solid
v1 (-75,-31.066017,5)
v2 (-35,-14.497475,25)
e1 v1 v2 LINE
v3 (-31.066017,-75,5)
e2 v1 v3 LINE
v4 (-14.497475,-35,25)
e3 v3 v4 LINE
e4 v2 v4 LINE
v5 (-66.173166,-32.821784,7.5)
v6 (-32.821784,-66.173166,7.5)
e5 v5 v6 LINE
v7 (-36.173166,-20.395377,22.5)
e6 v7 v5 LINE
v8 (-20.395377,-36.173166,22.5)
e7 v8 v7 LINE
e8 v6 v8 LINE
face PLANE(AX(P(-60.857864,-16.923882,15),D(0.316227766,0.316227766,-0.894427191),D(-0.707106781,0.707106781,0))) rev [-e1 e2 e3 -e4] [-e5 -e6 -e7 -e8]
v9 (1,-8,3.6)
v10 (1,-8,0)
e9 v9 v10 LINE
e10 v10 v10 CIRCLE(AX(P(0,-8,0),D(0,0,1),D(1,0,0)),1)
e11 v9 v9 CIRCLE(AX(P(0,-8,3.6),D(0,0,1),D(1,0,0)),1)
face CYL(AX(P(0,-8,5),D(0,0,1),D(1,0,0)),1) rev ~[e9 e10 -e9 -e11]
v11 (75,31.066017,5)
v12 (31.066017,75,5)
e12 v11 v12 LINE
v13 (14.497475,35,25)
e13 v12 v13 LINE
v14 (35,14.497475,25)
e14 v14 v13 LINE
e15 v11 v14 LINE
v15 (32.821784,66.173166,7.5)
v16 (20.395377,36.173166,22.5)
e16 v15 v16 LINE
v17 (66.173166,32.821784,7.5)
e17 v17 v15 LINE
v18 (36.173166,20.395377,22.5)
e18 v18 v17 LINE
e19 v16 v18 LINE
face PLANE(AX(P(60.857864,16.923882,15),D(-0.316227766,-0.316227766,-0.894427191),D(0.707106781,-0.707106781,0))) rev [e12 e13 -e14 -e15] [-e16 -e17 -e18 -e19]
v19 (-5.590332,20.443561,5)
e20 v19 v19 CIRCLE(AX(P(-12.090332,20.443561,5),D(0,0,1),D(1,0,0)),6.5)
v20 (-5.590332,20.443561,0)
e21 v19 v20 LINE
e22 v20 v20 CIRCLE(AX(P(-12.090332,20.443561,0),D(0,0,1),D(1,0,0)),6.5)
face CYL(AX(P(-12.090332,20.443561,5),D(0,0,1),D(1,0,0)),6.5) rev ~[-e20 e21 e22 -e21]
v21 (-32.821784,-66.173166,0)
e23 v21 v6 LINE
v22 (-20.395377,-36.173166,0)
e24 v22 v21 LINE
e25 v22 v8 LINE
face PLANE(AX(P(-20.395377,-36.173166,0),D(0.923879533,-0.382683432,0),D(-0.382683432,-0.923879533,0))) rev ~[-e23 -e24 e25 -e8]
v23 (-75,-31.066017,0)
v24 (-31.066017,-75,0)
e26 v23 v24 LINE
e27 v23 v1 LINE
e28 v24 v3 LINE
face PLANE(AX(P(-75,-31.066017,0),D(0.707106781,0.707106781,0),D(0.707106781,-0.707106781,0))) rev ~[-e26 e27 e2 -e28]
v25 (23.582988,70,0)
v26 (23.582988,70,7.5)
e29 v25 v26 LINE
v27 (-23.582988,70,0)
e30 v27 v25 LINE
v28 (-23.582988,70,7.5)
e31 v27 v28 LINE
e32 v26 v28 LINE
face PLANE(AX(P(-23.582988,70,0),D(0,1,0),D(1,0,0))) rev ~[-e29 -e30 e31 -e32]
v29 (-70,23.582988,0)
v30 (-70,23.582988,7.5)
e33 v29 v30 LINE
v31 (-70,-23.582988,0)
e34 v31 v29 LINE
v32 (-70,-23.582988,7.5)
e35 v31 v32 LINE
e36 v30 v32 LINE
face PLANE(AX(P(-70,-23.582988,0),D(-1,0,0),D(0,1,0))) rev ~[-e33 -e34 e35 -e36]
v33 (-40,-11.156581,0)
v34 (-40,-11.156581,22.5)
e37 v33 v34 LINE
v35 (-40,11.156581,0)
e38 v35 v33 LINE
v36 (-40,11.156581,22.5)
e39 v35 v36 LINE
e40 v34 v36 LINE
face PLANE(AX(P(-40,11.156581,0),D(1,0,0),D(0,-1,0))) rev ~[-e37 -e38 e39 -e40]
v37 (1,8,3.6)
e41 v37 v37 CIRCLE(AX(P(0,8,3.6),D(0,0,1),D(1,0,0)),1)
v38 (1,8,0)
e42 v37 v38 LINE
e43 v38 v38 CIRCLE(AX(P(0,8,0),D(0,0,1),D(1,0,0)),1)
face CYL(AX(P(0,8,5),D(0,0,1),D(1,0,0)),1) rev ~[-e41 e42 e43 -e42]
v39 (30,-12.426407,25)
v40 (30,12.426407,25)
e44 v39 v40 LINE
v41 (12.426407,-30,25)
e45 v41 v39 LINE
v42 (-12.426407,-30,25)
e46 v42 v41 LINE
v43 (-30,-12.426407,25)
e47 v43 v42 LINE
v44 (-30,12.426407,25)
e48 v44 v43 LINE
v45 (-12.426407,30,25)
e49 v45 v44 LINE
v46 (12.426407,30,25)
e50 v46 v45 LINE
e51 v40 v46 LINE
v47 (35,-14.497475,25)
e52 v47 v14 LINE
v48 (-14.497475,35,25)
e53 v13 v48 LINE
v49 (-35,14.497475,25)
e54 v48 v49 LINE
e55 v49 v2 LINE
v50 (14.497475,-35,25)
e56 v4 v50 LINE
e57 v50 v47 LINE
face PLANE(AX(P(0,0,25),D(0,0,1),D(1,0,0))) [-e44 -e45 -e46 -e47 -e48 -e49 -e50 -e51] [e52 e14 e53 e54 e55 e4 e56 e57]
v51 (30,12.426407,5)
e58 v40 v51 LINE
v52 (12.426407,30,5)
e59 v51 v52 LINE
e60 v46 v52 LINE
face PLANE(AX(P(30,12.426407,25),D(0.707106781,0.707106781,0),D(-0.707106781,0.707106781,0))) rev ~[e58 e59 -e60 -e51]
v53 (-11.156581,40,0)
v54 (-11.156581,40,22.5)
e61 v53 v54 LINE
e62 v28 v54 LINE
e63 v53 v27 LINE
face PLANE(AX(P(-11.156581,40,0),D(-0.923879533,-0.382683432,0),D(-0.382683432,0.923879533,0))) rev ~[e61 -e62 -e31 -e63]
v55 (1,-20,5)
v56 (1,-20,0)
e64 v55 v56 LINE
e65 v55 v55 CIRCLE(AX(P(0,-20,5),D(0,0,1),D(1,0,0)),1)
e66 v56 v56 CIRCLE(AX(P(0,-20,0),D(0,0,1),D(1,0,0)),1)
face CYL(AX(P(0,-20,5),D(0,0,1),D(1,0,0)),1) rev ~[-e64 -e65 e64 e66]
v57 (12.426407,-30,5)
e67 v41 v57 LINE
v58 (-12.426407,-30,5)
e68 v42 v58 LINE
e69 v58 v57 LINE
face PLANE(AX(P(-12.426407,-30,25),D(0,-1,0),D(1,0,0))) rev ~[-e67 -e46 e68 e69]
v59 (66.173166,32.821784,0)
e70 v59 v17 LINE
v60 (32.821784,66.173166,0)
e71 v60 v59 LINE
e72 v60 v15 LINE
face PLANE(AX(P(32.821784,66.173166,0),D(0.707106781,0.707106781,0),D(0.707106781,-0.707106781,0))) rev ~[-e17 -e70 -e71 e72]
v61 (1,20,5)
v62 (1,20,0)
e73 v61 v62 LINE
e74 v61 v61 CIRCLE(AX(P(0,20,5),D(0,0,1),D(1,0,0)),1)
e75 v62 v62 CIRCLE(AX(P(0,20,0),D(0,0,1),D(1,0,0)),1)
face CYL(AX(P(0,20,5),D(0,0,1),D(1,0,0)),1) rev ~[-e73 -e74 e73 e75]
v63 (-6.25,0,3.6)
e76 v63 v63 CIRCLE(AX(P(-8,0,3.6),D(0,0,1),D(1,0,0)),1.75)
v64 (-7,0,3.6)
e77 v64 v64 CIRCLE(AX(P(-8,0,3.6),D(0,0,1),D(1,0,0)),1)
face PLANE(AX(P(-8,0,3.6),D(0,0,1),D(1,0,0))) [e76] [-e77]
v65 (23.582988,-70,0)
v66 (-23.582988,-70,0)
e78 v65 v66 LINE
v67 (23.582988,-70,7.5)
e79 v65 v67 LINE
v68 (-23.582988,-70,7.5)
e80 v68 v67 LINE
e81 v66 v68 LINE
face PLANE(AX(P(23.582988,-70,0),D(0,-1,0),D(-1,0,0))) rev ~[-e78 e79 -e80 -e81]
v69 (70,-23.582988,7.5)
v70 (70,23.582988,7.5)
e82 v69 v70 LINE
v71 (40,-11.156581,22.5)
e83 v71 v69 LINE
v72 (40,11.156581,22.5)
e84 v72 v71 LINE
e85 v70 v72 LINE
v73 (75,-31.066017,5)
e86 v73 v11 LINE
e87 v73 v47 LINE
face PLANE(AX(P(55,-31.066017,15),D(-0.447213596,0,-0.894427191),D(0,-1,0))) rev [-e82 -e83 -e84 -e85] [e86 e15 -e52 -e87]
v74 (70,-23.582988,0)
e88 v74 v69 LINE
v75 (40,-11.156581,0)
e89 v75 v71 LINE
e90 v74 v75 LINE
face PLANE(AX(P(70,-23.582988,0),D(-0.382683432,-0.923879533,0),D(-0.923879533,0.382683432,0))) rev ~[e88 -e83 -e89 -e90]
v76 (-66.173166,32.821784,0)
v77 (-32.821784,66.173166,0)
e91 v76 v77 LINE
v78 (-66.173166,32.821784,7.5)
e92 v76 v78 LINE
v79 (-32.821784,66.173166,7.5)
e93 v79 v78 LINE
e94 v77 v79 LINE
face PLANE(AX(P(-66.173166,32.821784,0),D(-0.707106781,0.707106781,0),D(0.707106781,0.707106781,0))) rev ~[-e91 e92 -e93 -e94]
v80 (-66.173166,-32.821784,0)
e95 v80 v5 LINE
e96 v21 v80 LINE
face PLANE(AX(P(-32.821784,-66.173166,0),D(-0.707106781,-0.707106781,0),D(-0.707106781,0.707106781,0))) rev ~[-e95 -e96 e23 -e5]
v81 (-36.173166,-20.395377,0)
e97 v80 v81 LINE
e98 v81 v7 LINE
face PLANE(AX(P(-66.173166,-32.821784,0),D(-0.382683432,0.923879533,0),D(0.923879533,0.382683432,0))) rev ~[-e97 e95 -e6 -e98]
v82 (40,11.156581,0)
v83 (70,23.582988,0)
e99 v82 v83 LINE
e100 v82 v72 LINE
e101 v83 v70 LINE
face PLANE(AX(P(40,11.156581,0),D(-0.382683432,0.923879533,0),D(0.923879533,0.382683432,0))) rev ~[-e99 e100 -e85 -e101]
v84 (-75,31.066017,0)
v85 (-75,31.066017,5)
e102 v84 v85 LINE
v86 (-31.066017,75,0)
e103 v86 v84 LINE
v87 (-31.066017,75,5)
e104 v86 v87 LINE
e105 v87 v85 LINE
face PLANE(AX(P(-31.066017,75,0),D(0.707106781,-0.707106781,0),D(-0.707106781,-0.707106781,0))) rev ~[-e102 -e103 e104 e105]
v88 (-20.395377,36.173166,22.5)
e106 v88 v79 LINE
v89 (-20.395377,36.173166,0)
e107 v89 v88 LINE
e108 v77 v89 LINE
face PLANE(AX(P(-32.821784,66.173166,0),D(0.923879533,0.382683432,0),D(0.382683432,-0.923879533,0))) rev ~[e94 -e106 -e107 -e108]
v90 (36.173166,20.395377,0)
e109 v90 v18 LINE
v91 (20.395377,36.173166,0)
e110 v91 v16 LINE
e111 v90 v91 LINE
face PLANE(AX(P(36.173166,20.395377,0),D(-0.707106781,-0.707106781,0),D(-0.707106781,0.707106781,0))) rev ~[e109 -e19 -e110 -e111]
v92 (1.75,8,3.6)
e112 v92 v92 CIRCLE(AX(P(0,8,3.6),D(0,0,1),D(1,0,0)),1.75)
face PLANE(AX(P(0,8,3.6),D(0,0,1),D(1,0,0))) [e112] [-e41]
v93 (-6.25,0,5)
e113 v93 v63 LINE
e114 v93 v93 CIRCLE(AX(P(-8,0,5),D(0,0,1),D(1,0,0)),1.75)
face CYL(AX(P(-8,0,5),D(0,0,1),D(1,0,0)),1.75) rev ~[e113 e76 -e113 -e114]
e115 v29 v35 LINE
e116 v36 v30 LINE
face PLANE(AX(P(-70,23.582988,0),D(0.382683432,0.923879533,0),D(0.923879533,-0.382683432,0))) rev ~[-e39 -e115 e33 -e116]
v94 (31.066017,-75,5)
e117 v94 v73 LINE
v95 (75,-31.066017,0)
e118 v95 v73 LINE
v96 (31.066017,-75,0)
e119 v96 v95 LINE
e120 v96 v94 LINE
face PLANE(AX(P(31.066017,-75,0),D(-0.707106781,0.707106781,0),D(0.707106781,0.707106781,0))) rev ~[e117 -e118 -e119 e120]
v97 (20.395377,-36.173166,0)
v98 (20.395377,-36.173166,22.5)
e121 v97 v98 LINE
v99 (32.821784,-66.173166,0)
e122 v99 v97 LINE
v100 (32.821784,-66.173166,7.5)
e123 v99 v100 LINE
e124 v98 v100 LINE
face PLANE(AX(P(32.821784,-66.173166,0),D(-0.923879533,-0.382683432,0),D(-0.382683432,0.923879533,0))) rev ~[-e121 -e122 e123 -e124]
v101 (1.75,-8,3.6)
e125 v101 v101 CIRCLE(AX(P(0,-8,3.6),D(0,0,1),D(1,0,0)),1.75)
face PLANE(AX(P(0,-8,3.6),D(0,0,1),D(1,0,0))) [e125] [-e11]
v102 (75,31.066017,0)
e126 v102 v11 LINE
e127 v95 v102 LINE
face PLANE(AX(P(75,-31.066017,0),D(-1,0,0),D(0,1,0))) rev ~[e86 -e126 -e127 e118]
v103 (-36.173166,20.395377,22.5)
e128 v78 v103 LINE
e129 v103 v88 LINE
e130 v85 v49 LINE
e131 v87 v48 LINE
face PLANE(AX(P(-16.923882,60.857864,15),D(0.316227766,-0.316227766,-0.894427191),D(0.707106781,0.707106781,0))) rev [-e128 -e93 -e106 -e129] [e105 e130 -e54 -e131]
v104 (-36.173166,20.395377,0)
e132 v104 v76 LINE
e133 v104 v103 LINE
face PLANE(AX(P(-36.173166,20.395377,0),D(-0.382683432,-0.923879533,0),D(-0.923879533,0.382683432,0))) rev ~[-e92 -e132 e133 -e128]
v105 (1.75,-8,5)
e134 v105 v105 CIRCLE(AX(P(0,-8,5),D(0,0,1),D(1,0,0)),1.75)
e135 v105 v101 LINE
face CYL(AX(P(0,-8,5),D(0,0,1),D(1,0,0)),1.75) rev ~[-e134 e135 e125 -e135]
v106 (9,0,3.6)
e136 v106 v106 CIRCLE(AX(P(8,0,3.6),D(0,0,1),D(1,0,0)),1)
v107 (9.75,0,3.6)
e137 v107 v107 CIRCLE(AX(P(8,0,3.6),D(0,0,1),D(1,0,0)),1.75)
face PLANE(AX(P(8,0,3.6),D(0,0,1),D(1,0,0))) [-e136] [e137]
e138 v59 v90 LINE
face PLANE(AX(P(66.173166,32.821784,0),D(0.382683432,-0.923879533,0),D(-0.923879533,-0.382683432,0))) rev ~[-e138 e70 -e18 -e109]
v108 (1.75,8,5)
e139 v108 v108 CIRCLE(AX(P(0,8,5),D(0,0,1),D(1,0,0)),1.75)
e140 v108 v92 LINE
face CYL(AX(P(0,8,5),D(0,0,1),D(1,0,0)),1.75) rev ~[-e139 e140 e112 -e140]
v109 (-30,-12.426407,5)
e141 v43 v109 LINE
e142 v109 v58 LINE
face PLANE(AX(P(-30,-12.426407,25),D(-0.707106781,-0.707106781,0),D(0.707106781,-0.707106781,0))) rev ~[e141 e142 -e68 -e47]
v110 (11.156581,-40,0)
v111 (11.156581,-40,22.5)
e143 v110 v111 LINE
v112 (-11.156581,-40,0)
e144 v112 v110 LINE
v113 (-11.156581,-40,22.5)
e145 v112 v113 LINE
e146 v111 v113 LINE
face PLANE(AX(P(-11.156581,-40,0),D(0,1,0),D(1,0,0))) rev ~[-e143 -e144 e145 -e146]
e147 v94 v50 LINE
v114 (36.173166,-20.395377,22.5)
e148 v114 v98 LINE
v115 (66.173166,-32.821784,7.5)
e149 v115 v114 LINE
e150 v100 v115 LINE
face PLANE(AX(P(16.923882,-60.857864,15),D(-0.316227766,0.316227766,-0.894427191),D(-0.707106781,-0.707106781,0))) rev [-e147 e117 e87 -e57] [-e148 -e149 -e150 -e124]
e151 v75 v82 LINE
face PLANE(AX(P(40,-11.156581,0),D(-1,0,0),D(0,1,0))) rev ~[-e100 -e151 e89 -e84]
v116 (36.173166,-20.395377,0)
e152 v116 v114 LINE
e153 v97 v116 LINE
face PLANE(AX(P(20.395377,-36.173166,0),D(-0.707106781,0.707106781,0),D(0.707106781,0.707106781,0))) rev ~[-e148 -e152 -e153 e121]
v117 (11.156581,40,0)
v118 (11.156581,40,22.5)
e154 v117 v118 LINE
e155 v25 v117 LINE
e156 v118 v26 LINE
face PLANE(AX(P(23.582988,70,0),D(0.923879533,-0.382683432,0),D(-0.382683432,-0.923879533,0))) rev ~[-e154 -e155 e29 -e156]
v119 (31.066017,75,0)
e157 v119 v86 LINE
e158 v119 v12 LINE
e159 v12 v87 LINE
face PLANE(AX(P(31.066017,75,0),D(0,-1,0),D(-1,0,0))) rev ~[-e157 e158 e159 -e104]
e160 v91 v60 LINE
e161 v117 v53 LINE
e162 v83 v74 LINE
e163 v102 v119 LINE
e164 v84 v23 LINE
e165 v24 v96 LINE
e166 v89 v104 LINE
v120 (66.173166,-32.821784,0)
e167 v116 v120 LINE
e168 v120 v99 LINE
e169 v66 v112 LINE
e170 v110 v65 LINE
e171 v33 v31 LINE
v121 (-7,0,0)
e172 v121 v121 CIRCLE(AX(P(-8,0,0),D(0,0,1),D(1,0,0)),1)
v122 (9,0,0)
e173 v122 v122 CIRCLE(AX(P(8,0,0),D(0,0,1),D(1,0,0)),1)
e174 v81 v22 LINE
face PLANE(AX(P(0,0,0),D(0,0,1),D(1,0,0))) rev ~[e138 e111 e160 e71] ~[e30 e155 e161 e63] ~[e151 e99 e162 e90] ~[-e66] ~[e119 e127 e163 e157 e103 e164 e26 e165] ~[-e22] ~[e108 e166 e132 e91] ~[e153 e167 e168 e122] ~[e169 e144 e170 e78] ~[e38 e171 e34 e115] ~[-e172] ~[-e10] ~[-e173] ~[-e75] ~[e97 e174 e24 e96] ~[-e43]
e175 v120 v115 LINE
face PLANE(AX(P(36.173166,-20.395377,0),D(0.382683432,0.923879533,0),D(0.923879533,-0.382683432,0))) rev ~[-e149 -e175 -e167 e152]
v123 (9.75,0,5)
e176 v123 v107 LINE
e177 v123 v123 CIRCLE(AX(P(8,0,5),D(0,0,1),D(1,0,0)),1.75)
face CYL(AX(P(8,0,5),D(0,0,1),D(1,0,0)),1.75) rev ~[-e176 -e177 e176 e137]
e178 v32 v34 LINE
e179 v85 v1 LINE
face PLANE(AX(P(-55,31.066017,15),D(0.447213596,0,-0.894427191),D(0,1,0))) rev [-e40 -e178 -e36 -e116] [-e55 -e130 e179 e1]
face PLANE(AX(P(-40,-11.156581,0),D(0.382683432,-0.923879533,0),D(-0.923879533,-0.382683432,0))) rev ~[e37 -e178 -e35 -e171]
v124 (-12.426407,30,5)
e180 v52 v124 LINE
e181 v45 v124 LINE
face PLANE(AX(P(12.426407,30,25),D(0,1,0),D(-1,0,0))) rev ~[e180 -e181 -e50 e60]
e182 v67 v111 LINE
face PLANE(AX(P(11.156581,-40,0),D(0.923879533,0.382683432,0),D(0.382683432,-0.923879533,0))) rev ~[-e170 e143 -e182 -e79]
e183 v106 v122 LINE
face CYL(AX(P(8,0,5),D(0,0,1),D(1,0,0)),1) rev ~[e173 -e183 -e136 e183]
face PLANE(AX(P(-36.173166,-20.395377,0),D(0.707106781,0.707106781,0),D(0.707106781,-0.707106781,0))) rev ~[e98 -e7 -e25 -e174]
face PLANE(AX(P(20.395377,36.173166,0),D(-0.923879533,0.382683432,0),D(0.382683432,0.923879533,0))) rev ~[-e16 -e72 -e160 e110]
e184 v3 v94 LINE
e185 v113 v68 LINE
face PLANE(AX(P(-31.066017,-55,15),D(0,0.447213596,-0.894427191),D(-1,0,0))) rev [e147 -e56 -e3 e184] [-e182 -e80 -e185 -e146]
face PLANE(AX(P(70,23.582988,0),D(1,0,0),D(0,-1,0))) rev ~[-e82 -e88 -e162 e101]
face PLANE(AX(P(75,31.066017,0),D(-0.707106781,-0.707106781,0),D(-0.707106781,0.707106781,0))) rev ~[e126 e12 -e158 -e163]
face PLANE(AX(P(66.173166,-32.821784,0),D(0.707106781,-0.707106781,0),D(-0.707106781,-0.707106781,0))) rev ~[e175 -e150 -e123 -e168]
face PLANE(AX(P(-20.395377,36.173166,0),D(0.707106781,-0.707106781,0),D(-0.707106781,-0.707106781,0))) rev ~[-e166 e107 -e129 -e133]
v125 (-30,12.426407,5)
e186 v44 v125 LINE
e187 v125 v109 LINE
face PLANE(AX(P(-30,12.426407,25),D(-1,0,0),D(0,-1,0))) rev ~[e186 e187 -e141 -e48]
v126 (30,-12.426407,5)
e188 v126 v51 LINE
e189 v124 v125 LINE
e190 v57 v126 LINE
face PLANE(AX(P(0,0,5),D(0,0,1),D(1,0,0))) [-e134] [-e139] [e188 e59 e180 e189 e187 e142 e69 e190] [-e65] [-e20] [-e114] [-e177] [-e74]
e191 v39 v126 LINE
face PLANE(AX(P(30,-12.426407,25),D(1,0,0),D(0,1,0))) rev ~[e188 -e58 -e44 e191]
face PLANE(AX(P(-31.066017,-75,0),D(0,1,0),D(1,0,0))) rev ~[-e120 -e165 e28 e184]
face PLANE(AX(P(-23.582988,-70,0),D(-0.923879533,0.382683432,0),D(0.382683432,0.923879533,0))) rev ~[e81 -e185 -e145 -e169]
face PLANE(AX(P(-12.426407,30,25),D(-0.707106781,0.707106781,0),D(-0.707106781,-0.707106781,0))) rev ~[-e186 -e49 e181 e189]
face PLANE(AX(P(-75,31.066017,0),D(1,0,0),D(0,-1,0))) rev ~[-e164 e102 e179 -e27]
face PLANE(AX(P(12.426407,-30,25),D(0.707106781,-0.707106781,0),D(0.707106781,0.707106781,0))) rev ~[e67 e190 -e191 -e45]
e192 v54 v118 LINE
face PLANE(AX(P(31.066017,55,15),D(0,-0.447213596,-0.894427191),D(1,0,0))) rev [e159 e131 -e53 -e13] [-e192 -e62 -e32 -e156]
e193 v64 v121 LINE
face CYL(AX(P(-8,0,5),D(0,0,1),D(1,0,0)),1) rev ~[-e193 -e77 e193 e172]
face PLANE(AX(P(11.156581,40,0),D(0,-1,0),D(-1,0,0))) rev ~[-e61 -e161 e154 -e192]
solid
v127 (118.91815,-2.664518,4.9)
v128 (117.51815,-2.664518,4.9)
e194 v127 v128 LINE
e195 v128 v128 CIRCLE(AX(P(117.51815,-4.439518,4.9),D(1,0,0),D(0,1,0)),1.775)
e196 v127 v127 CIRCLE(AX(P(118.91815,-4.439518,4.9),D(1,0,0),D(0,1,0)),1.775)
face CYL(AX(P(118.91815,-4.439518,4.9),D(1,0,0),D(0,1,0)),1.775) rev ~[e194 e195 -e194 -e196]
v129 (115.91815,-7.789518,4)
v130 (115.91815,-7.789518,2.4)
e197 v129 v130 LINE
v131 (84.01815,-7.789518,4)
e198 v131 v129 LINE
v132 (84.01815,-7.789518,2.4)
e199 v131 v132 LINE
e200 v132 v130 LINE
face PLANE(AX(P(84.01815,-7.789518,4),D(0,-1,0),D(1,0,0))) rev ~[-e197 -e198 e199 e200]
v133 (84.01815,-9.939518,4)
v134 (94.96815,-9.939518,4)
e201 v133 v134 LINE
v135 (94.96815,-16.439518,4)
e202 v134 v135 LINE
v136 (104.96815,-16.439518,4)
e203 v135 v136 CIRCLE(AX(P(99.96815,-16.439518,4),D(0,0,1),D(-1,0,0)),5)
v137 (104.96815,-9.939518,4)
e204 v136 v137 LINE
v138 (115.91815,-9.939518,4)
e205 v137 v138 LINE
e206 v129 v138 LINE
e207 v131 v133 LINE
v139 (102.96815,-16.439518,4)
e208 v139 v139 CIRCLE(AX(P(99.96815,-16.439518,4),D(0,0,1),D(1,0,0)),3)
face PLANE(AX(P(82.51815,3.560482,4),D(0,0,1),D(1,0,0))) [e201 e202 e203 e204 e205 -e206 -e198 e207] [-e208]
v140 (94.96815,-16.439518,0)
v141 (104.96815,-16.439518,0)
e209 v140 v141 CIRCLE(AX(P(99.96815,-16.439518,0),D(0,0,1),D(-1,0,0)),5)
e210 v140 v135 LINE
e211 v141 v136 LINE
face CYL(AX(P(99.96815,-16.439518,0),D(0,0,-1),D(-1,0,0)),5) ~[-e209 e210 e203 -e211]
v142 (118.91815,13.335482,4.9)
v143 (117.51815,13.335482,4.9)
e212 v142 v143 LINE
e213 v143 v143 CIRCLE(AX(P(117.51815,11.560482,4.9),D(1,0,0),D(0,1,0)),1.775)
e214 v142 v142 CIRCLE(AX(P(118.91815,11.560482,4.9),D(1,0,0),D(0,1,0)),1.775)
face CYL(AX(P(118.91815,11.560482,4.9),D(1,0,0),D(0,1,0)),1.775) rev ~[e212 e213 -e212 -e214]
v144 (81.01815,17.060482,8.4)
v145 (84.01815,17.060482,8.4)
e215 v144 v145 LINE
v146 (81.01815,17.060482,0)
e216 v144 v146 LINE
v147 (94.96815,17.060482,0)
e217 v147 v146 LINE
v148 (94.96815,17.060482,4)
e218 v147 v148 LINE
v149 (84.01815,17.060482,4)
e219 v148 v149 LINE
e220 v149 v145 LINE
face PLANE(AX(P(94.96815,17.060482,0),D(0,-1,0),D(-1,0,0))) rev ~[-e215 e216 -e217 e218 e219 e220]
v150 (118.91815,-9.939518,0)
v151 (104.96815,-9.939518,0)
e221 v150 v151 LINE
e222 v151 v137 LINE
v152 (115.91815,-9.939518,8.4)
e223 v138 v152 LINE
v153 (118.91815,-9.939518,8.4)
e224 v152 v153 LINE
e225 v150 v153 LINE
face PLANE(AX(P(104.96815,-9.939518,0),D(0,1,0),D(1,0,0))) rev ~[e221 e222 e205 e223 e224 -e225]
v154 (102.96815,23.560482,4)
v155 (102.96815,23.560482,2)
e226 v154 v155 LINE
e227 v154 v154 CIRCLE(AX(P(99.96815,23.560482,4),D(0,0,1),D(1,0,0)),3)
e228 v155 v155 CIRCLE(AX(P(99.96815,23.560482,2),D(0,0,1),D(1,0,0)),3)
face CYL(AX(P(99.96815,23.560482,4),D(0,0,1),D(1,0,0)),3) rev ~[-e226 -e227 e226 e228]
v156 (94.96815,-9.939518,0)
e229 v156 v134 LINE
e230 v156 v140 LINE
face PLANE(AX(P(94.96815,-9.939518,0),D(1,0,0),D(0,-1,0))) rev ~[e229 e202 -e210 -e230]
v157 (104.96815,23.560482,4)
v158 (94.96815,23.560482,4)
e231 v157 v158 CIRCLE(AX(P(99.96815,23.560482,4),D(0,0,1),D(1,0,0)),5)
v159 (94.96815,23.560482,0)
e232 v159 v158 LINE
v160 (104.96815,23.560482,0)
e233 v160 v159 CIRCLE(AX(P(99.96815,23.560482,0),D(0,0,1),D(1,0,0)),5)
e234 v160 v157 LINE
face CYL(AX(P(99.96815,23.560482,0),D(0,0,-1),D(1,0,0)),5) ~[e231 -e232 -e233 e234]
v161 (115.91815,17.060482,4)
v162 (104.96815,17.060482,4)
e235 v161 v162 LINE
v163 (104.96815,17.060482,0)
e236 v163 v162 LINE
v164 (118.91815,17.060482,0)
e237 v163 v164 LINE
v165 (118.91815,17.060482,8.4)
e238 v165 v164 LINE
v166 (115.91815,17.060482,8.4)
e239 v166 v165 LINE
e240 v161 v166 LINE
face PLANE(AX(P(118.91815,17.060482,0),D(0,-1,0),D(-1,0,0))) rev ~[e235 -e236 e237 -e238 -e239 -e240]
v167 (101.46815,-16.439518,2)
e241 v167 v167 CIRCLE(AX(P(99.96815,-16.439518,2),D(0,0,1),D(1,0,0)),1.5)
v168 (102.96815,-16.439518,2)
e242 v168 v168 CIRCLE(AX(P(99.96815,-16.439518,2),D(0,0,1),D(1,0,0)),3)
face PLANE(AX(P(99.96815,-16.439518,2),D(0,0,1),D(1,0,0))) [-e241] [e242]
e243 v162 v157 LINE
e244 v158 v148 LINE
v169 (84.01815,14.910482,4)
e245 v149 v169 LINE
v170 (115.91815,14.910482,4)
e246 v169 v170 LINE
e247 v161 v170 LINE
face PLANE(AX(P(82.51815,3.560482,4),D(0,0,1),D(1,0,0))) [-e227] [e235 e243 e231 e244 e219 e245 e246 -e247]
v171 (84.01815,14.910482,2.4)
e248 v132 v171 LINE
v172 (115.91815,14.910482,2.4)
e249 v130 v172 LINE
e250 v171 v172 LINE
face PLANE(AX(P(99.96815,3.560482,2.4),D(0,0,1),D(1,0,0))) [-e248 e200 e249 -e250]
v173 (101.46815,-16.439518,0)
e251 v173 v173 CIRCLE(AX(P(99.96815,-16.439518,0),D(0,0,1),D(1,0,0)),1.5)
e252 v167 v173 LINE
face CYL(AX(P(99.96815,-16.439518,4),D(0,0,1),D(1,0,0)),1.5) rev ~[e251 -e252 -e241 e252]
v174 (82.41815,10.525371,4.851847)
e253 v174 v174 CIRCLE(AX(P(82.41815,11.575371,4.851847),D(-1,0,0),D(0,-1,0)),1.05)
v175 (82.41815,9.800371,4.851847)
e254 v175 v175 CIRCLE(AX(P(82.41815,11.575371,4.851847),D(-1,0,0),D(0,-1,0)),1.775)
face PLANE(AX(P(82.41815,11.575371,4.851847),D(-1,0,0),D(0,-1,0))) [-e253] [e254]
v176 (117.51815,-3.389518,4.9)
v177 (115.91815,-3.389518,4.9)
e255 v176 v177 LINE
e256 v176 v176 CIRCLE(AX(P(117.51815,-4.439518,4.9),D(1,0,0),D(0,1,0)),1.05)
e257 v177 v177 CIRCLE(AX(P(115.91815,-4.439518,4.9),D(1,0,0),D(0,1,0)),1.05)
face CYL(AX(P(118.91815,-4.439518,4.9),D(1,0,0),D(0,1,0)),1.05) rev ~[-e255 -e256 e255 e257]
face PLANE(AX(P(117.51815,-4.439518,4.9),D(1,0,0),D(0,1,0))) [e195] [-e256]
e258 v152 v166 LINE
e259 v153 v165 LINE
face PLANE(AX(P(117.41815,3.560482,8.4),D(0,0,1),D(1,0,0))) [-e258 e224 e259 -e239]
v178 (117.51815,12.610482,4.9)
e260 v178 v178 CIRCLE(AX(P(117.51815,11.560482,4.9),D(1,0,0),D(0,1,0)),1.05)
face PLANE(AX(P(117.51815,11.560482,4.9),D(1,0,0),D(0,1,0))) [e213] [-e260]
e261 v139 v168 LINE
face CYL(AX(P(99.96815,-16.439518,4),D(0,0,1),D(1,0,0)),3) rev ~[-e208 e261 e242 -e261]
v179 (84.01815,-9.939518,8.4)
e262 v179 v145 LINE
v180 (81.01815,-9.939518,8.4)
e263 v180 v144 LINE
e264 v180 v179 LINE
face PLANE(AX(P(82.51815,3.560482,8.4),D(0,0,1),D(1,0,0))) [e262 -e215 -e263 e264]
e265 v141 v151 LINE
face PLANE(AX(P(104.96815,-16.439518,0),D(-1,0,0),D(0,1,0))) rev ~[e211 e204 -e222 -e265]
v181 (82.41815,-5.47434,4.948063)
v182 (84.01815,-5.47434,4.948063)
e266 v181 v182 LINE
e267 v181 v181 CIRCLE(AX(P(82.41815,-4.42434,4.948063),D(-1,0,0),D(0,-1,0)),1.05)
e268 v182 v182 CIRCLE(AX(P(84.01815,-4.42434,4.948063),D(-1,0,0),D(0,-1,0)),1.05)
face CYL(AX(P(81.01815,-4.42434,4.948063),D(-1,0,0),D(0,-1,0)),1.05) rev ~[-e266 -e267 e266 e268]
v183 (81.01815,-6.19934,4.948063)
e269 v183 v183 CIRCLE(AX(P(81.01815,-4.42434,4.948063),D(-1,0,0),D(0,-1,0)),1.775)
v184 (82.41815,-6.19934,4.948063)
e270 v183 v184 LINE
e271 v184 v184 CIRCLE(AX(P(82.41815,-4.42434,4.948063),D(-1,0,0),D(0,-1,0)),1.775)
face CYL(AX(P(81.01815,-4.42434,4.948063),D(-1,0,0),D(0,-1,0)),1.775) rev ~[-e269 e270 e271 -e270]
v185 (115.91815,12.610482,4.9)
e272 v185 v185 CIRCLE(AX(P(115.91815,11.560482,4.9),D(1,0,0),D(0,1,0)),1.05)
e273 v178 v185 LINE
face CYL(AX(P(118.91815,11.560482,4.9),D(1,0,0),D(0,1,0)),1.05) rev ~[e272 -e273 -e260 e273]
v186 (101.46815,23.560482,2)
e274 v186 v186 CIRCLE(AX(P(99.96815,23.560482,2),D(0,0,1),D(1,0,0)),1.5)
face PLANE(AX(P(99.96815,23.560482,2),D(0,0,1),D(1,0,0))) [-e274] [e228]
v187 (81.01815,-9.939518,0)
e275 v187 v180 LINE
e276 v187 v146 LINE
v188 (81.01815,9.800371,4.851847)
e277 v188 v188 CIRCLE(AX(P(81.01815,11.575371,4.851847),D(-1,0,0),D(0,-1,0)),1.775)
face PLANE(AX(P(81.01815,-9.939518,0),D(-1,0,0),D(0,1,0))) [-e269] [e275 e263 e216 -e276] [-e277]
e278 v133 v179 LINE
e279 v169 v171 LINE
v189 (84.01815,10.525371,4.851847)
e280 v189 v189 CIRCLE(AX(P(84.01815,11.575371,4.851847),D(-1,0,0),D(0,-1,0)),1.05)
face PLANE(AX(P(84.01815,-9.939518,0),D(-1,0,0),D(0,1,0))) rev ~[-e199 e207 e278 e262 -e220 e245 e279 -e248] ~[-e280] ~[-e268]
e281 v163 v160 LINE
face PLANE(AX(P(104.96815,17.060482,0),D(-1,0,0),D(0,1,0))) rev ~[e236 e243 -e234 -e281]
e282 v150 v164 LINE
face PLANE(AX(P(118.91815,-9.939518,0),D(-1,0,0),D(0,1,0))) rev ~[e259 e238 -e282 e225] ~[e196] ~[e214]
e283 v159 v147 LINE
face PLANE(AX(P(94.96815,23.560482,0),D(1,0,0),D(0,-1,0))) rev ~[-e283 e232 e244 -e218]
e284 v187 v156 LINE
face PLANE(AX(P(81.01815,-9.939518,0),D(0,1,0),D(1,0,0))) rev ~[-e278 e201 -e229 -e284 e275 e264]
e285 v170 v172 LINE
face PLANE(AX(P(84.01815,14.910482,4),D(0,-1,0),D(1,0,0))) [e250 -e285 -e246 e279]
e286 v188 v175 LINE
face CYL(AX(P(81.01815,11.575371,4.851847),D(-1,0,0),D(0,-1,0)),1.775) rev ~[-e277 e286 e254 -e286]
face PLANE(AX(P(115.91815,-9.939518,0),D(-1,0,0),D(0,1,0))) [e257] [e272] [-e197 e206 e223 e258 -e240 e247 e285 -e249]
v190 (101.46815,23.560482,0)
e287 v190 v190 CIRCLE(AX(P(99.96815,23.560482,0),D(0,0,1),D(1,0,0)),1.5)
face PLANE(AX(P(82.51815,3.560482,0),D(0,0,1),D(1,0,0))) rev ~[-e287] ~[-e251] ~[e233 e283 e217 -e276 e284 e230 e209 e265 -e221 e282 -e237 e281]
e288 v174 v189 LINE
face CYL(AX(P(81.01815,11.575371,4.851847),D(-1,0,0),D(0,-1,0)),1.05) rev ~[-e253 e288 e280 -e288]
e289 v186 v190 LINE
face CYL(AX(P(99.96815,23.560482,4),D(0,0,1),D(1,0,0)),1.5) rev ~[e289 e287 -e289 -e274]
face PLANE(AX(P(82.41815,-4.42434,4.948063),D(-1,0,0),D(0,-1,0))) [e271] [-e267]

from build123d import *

# Parameters (mm, degrees)
F2_DEPTH  = 25
F3_SIZE2  = 40
F3_SIZE   = 20
F5_DEPTH  = 20
F6_R      = 1
F7_DEPTH  = 25
F9_DEPTH  = 25
F6_R_2    = 1.75
F10_DEPTH = 1.4
F11_W     = 3
F11_H     = 27
F12_DEPTH = 4
F13_DEPTH = 8.4
F14_W     = 31.9
F14_H     = 22.7
F15_DEPTH = 1.6
F16_R     = 1.05
F17_DEPTH = 5
F16_R_2   = 1.775
F18_DEPTH = 1.4
F19_R     = 1.05
F20_DEPTH = 4
F19_R_2   = 1.775
F21_DEPTH = 1.4
F22_R     = 1.5
F23_DEPTH = 25
F22_R_2   = 3
F24_DEPTH = 2
F25_R     = 1
F26_DEPTH = 25
F27_R     = 6.5
F28_DEPTH = 25


# Not quite as in the source:
# - a feature names something its author has since deleted; it is built from what else it names


with BuildPart() as f2:
    # F1 (on offset) → F2 (new body)
    with BuildSketch(Plane.XY):
        Polygon((75, -31.066017178), (75, 31.066017178), (31.066017178, 75), (-31.066017178, 75), (-75, 31.066017178), (-75, -31.066017178), (-31.066017178, -75), (31.066017178, -75), align=None)
    extrude(amount=F2_DEPTH)

    # F3
    f3_edges = [f2.edges().sort_by_distance(p)[0] for p in [
        (-75, 0, 25),
        (75, 0, 25),
        (53.033009, 53.033009, 25),
        (0, 75, 25),
        (-53.033009, 53.033009, 25),
        (-53.033009, -53.033009, 25),
        (0, -75, 25),
        (53.033009, -53.033009, 25),
    ]]
    chamfer(f3_edges, length=F3_SIZE, length2=F3_SIZE2)

    # F4 (on face) → F5 (cut)
    with BuildSketch(Plane.XY.offset(25)):
        Polygon((-30, -12.4264068712), (-12.4264068712, -30), (12.4264068712, -30), (30, -12.4264068712), (30, 12.4264068712), (12.4264068712, 30), (-12.4264068712, 30), (-30, 12.4264068712), align=None)
    extrude(amount=-F5_DEPTH, mode=Mode.SUBTRACT)

    # F6 (on face) → F7 (cut)
    with BuildSketch(Plane.XY.offset(5)):
        with Locations((8, 0)):
            Circle(F6_R)
        with Locations((0, 8)):
            Circle(F6_R)
        with Locations((-8, 0)):
            Circle(F6_R)
        with Locations((0, -8)):
            Circle(F6_R)
    extrude(amount=-F7_DEPTH, mode=Mode.SUBTRACT)

    # F8 (on face) → F9 (cut)
    with BuildSketch(Plane(origin=(0, 0, 0), x_dir=(1, 0, 0), z_dir=(0, 0, -1))):
        Polygon((-66.1731656763, 32.8217836898), (-36.1731656763, 20.3953768186), (-20.3953768186, 36.1731656763), (-32.8217836898, 66.1731656763), align=None)
        Polygon((-11.1565814935, 40), (11.1565814935, 40), (23.5829883647, 70), (-23.5829883647, 70), align=None)
        Polygon((32.8217836898, 66.1731656763), (20.3953768186, 36.1731656763), (36.1731656763, 20.3953768186), (66.1731656763, 32.8217836898), align=None)
        Polygon((70, -23.5829883647), (70, 23.5829883647), (40, 11.1565814935), (40, -11.1565814935), align=None)
        Polygon((32.8217836898, -66.1731656763), (66.1731656763, -32.8217836898), (36.1731656763, -20.3953768186), (20.3953768186, -36.1731656763), align=None)
        Polygon((-23.5829883647, -70), (23.5829883647, -70), (11.1565814935, -40), (-11.1565814935, -40), align=None)
        Polygon((-66.1731656763, -32.8217836898), (-32.8217836898, -66.1731656763), (-20.3953768186, -36.1731656763), (-36.1731656763, -20.3953768186), align=None)
        Polygon((-70, -23.5829883647), (-40, -11.1565814935), (-40, 11.1565814935), (-70, 23.5829883647), align=None)
    extrude(amount=-F9_DEPTH, mode=Mode.SUBTRACT)

    # F6 (on face) → F10 (cut)
    with BuildSketch(Plane.XY.offset(5)):
        with Locations((-8, 0)):
            Circle(F6_R_2)
        with Locations((-8, 0)):
            Circle(F6_R, mode=Mode.SUBTRACT)
        with Locations((0, 8)):
            Circle(F6_R_2)
        with Locations((0, 8)):
            Circle(F6_R, mode=Mode.SUBTRACT)
        with Locations((8, 0)):
            Circle(F6_R_2)
        with Locations((8, 0)):
            Circle(F6_R, mode=Mode.SUBTRACT)
        with Locations((0, -8)):
            Circle(F6_R_2)
        with Locations((0, -8)):
            Circle(F6_R, mode=Mode.SUBTRACT)
    extrude(amount=-F10_DEPTH, mode=Mode.SUBTRACT)

    # F25 (on face) → F26 (cut)
    with BuildSketch(Plane.XY.offset(5)):
        with Locations((0, 20)):
            Circle(F25_R)
        with Locations((0, -20)):
            Circle(F25_R)
    extrude(amount=-F26_DEPTH, mode=Mode.SUBTRACT)

    # F27 (on face) → F28 (cut)
    with BuildSketch(Plane.XY.offset(5)):
        with Locations((-12.0903318748, 20.4435605556)):
            Circle(F27_R)
    extrude(amount=-F28_DEPTH, mode=Mode.SUBTRACT)


with BuildPart() as f12:
    # F11 (on offset) → F12 (new body)
    with BuildSketch(Plane.XY):
        with Locations((82.5181498528, 3.5604816154)):
            Rectangle(F11_W, F11_H)
        Polygon((94.9681498528, 17.0604816154), (84.0181498528, 17.0604816154), (84.0181498528, -9.9395183846), (94.9681498528, -9.9395183846), (104.9681498528, -9.9395183846), (115.9181498528, -9.9395183846), (115.9181498528, 17.0604816154), (104.9681498528, 17.0604816154), align=None)
        with BuildLine():
            Line((94.9681498528, 23.5604816154), (94.9681498528, 17.0604816154))
            Line((94.9681498528, 17.0604816154), (104.9681498528, 17.0604816154))
            Line((104.9681498528, 17.0604816154), (104.9681498528, 23.5604816154))
            ThreePointArc((104.9681498528, 23.5604816154), (99.9681498528, 28.5604816154), (94.9681498528, 23.5604816154))
        make_face()
        with BuildLine():
            Line((104.9681498528, -9.9395183846), (94.9681498528, -9.9395183846))
            Line((94.9681498528, -9.9395183846), (94.9681498528, -16.4395183846))
            ThreePointArc((94.9681498528, -16.4395183846), (99.9681498528, -21.4395183846), (104.9681498528, -16.4395183846))
            Line((104.9681498528, -16.4395183846), (104.9681498528, -9.9395183846))
        make_face()
        with Locations((117.4181498528, 3.5604816154)):
            Rectangle(F11_W, F11_H)
    extrude(amount=F12_DEPTH)

    # F11 (on offset) → F13 (join)
    with BuildSketch(Plane.XY):
        with Locations((82.5181498528, 3.5604816154)):
            Rectangle(F11_W, F11_H)
        with Locations((117.4181498528, 3.5604816154)):
            Rectangle(F11_W, F11_H)
    extrude(amount=F13_DEPTH)

    # F14 (on face) → F15 (cut)
    with BuildSketch(Plane.XY.offset(4)):
        with Locations((99.9681498528, 3.5604816154)):
            Rectangle(F14_W, F14_H)
    extrude(amount=-F15_DEPTH, mode=Mode.SUBTRACT)

    # F16 (on face) → F17 (cut)
    with BuildSketch(Plane.YZ.offset(118.9181498528)):
        with Locations((11.5604816154, 4.9)):
            Circle(F16_R)
        with Locations((-4.4395183846, 4.9)):
            Circle(F16_R)
    extrude(amount=-F17_DEPTH, mode=Mode.SUBTRACT)

    # F16 (on face) → F18 (cut)
    with BuildSketch(Plane.YZ.offset(118.9181498528)):
        with Locations((-4.4395183846, 4.9)):
            Circle(F16_R_2)
        with Locations((-4.4395183846, 4.9)):
            Circle(F16_R, mode=Mode.SUBTRACT)
        with Locations((11.5604816154, 4.9)):
            Circle(F16_R_2)
        with Locations((11.5604816154, 4.9)):
            Circle(F16_R, mode=Mode.SUBTRACT)
    extrude(amount=-F18_DEPTH, mode=Mode.SUBTRACT)

    # F19 (on face) → F20 (cut)
    with BuildSketch(Plane(origin=(81.0181498528, 0, 0), x_dir=(0, -1, 0), z_dir=(-1, 0, 0))):
        with Locations((4.4243399079, 4.9480630373)):
            Circle(F19_R)
        with Locations((-11.5753707892, 4.8518465555)):
            Circle(F19_R)
    extrude(amount=-F20_DEPTH, mode=Mode.SUBTRACT)

    # F19 (on face) → F21 (cut)
    with BuildSketch(Plane(origin=(81.0181498528, 0, 0), x_dir=(0, -1, 0), z_dir=(-1, 0, 0))):
        with Locations((-11.5753707892, 4.8518465555)):
            Circle(F19_R_2)
        with Locations((-11.5753707892, 4.8518465555)):
            Circle(F19_R, mode=Mode.SUBTRACT)
        with Locations((4.4243399079, 4.9480630373)):
            Circle(F19_R_2)
        with Locations((4.4243399079, 4.9480630373)):
            Circle(F19_R, mode=Mode.SUBTRACT)
    extrude(amount=-F21_DEPTH, mode=Mode.SUBTRACT)

    # F22 (on face) → F23 (cut)
    with BuildSketch(Plane.XY.offset(4)):
        with Locations((99.9681498528, 23.5604816154)):
            Circle(F22_R)
        with Locations((99.9681498528, -16.4395183846)):
            Circle(F22_R)
    extrude(amount=-F23_DEPTH, mode=Mode.SUBTRACT)

    # F22 (on face) → F24 (cut)
    with BuildSketch(Plane.XY.offset(4)):
        with Locations((99.9681498528, -16.4395183846)):
            Circle(F22_R_2)
        with Locations((99.9681498528, -16.4395183846)):
            Circle(F22_R, mode=Mode.SUBTRACT)
        with Locations((99.9681498528, 23.5604816154)):
            Circle(F22_R_2)
        with Locations((99.9681498528, 23.5604816154)):
            Circle(F22_R, mode=Mode.SUBTRACT)
    extrude(amount=-F24_DEPTH, mode=Mode.SUBTRACT)


solid = Compound([f2.part, f12.part])
